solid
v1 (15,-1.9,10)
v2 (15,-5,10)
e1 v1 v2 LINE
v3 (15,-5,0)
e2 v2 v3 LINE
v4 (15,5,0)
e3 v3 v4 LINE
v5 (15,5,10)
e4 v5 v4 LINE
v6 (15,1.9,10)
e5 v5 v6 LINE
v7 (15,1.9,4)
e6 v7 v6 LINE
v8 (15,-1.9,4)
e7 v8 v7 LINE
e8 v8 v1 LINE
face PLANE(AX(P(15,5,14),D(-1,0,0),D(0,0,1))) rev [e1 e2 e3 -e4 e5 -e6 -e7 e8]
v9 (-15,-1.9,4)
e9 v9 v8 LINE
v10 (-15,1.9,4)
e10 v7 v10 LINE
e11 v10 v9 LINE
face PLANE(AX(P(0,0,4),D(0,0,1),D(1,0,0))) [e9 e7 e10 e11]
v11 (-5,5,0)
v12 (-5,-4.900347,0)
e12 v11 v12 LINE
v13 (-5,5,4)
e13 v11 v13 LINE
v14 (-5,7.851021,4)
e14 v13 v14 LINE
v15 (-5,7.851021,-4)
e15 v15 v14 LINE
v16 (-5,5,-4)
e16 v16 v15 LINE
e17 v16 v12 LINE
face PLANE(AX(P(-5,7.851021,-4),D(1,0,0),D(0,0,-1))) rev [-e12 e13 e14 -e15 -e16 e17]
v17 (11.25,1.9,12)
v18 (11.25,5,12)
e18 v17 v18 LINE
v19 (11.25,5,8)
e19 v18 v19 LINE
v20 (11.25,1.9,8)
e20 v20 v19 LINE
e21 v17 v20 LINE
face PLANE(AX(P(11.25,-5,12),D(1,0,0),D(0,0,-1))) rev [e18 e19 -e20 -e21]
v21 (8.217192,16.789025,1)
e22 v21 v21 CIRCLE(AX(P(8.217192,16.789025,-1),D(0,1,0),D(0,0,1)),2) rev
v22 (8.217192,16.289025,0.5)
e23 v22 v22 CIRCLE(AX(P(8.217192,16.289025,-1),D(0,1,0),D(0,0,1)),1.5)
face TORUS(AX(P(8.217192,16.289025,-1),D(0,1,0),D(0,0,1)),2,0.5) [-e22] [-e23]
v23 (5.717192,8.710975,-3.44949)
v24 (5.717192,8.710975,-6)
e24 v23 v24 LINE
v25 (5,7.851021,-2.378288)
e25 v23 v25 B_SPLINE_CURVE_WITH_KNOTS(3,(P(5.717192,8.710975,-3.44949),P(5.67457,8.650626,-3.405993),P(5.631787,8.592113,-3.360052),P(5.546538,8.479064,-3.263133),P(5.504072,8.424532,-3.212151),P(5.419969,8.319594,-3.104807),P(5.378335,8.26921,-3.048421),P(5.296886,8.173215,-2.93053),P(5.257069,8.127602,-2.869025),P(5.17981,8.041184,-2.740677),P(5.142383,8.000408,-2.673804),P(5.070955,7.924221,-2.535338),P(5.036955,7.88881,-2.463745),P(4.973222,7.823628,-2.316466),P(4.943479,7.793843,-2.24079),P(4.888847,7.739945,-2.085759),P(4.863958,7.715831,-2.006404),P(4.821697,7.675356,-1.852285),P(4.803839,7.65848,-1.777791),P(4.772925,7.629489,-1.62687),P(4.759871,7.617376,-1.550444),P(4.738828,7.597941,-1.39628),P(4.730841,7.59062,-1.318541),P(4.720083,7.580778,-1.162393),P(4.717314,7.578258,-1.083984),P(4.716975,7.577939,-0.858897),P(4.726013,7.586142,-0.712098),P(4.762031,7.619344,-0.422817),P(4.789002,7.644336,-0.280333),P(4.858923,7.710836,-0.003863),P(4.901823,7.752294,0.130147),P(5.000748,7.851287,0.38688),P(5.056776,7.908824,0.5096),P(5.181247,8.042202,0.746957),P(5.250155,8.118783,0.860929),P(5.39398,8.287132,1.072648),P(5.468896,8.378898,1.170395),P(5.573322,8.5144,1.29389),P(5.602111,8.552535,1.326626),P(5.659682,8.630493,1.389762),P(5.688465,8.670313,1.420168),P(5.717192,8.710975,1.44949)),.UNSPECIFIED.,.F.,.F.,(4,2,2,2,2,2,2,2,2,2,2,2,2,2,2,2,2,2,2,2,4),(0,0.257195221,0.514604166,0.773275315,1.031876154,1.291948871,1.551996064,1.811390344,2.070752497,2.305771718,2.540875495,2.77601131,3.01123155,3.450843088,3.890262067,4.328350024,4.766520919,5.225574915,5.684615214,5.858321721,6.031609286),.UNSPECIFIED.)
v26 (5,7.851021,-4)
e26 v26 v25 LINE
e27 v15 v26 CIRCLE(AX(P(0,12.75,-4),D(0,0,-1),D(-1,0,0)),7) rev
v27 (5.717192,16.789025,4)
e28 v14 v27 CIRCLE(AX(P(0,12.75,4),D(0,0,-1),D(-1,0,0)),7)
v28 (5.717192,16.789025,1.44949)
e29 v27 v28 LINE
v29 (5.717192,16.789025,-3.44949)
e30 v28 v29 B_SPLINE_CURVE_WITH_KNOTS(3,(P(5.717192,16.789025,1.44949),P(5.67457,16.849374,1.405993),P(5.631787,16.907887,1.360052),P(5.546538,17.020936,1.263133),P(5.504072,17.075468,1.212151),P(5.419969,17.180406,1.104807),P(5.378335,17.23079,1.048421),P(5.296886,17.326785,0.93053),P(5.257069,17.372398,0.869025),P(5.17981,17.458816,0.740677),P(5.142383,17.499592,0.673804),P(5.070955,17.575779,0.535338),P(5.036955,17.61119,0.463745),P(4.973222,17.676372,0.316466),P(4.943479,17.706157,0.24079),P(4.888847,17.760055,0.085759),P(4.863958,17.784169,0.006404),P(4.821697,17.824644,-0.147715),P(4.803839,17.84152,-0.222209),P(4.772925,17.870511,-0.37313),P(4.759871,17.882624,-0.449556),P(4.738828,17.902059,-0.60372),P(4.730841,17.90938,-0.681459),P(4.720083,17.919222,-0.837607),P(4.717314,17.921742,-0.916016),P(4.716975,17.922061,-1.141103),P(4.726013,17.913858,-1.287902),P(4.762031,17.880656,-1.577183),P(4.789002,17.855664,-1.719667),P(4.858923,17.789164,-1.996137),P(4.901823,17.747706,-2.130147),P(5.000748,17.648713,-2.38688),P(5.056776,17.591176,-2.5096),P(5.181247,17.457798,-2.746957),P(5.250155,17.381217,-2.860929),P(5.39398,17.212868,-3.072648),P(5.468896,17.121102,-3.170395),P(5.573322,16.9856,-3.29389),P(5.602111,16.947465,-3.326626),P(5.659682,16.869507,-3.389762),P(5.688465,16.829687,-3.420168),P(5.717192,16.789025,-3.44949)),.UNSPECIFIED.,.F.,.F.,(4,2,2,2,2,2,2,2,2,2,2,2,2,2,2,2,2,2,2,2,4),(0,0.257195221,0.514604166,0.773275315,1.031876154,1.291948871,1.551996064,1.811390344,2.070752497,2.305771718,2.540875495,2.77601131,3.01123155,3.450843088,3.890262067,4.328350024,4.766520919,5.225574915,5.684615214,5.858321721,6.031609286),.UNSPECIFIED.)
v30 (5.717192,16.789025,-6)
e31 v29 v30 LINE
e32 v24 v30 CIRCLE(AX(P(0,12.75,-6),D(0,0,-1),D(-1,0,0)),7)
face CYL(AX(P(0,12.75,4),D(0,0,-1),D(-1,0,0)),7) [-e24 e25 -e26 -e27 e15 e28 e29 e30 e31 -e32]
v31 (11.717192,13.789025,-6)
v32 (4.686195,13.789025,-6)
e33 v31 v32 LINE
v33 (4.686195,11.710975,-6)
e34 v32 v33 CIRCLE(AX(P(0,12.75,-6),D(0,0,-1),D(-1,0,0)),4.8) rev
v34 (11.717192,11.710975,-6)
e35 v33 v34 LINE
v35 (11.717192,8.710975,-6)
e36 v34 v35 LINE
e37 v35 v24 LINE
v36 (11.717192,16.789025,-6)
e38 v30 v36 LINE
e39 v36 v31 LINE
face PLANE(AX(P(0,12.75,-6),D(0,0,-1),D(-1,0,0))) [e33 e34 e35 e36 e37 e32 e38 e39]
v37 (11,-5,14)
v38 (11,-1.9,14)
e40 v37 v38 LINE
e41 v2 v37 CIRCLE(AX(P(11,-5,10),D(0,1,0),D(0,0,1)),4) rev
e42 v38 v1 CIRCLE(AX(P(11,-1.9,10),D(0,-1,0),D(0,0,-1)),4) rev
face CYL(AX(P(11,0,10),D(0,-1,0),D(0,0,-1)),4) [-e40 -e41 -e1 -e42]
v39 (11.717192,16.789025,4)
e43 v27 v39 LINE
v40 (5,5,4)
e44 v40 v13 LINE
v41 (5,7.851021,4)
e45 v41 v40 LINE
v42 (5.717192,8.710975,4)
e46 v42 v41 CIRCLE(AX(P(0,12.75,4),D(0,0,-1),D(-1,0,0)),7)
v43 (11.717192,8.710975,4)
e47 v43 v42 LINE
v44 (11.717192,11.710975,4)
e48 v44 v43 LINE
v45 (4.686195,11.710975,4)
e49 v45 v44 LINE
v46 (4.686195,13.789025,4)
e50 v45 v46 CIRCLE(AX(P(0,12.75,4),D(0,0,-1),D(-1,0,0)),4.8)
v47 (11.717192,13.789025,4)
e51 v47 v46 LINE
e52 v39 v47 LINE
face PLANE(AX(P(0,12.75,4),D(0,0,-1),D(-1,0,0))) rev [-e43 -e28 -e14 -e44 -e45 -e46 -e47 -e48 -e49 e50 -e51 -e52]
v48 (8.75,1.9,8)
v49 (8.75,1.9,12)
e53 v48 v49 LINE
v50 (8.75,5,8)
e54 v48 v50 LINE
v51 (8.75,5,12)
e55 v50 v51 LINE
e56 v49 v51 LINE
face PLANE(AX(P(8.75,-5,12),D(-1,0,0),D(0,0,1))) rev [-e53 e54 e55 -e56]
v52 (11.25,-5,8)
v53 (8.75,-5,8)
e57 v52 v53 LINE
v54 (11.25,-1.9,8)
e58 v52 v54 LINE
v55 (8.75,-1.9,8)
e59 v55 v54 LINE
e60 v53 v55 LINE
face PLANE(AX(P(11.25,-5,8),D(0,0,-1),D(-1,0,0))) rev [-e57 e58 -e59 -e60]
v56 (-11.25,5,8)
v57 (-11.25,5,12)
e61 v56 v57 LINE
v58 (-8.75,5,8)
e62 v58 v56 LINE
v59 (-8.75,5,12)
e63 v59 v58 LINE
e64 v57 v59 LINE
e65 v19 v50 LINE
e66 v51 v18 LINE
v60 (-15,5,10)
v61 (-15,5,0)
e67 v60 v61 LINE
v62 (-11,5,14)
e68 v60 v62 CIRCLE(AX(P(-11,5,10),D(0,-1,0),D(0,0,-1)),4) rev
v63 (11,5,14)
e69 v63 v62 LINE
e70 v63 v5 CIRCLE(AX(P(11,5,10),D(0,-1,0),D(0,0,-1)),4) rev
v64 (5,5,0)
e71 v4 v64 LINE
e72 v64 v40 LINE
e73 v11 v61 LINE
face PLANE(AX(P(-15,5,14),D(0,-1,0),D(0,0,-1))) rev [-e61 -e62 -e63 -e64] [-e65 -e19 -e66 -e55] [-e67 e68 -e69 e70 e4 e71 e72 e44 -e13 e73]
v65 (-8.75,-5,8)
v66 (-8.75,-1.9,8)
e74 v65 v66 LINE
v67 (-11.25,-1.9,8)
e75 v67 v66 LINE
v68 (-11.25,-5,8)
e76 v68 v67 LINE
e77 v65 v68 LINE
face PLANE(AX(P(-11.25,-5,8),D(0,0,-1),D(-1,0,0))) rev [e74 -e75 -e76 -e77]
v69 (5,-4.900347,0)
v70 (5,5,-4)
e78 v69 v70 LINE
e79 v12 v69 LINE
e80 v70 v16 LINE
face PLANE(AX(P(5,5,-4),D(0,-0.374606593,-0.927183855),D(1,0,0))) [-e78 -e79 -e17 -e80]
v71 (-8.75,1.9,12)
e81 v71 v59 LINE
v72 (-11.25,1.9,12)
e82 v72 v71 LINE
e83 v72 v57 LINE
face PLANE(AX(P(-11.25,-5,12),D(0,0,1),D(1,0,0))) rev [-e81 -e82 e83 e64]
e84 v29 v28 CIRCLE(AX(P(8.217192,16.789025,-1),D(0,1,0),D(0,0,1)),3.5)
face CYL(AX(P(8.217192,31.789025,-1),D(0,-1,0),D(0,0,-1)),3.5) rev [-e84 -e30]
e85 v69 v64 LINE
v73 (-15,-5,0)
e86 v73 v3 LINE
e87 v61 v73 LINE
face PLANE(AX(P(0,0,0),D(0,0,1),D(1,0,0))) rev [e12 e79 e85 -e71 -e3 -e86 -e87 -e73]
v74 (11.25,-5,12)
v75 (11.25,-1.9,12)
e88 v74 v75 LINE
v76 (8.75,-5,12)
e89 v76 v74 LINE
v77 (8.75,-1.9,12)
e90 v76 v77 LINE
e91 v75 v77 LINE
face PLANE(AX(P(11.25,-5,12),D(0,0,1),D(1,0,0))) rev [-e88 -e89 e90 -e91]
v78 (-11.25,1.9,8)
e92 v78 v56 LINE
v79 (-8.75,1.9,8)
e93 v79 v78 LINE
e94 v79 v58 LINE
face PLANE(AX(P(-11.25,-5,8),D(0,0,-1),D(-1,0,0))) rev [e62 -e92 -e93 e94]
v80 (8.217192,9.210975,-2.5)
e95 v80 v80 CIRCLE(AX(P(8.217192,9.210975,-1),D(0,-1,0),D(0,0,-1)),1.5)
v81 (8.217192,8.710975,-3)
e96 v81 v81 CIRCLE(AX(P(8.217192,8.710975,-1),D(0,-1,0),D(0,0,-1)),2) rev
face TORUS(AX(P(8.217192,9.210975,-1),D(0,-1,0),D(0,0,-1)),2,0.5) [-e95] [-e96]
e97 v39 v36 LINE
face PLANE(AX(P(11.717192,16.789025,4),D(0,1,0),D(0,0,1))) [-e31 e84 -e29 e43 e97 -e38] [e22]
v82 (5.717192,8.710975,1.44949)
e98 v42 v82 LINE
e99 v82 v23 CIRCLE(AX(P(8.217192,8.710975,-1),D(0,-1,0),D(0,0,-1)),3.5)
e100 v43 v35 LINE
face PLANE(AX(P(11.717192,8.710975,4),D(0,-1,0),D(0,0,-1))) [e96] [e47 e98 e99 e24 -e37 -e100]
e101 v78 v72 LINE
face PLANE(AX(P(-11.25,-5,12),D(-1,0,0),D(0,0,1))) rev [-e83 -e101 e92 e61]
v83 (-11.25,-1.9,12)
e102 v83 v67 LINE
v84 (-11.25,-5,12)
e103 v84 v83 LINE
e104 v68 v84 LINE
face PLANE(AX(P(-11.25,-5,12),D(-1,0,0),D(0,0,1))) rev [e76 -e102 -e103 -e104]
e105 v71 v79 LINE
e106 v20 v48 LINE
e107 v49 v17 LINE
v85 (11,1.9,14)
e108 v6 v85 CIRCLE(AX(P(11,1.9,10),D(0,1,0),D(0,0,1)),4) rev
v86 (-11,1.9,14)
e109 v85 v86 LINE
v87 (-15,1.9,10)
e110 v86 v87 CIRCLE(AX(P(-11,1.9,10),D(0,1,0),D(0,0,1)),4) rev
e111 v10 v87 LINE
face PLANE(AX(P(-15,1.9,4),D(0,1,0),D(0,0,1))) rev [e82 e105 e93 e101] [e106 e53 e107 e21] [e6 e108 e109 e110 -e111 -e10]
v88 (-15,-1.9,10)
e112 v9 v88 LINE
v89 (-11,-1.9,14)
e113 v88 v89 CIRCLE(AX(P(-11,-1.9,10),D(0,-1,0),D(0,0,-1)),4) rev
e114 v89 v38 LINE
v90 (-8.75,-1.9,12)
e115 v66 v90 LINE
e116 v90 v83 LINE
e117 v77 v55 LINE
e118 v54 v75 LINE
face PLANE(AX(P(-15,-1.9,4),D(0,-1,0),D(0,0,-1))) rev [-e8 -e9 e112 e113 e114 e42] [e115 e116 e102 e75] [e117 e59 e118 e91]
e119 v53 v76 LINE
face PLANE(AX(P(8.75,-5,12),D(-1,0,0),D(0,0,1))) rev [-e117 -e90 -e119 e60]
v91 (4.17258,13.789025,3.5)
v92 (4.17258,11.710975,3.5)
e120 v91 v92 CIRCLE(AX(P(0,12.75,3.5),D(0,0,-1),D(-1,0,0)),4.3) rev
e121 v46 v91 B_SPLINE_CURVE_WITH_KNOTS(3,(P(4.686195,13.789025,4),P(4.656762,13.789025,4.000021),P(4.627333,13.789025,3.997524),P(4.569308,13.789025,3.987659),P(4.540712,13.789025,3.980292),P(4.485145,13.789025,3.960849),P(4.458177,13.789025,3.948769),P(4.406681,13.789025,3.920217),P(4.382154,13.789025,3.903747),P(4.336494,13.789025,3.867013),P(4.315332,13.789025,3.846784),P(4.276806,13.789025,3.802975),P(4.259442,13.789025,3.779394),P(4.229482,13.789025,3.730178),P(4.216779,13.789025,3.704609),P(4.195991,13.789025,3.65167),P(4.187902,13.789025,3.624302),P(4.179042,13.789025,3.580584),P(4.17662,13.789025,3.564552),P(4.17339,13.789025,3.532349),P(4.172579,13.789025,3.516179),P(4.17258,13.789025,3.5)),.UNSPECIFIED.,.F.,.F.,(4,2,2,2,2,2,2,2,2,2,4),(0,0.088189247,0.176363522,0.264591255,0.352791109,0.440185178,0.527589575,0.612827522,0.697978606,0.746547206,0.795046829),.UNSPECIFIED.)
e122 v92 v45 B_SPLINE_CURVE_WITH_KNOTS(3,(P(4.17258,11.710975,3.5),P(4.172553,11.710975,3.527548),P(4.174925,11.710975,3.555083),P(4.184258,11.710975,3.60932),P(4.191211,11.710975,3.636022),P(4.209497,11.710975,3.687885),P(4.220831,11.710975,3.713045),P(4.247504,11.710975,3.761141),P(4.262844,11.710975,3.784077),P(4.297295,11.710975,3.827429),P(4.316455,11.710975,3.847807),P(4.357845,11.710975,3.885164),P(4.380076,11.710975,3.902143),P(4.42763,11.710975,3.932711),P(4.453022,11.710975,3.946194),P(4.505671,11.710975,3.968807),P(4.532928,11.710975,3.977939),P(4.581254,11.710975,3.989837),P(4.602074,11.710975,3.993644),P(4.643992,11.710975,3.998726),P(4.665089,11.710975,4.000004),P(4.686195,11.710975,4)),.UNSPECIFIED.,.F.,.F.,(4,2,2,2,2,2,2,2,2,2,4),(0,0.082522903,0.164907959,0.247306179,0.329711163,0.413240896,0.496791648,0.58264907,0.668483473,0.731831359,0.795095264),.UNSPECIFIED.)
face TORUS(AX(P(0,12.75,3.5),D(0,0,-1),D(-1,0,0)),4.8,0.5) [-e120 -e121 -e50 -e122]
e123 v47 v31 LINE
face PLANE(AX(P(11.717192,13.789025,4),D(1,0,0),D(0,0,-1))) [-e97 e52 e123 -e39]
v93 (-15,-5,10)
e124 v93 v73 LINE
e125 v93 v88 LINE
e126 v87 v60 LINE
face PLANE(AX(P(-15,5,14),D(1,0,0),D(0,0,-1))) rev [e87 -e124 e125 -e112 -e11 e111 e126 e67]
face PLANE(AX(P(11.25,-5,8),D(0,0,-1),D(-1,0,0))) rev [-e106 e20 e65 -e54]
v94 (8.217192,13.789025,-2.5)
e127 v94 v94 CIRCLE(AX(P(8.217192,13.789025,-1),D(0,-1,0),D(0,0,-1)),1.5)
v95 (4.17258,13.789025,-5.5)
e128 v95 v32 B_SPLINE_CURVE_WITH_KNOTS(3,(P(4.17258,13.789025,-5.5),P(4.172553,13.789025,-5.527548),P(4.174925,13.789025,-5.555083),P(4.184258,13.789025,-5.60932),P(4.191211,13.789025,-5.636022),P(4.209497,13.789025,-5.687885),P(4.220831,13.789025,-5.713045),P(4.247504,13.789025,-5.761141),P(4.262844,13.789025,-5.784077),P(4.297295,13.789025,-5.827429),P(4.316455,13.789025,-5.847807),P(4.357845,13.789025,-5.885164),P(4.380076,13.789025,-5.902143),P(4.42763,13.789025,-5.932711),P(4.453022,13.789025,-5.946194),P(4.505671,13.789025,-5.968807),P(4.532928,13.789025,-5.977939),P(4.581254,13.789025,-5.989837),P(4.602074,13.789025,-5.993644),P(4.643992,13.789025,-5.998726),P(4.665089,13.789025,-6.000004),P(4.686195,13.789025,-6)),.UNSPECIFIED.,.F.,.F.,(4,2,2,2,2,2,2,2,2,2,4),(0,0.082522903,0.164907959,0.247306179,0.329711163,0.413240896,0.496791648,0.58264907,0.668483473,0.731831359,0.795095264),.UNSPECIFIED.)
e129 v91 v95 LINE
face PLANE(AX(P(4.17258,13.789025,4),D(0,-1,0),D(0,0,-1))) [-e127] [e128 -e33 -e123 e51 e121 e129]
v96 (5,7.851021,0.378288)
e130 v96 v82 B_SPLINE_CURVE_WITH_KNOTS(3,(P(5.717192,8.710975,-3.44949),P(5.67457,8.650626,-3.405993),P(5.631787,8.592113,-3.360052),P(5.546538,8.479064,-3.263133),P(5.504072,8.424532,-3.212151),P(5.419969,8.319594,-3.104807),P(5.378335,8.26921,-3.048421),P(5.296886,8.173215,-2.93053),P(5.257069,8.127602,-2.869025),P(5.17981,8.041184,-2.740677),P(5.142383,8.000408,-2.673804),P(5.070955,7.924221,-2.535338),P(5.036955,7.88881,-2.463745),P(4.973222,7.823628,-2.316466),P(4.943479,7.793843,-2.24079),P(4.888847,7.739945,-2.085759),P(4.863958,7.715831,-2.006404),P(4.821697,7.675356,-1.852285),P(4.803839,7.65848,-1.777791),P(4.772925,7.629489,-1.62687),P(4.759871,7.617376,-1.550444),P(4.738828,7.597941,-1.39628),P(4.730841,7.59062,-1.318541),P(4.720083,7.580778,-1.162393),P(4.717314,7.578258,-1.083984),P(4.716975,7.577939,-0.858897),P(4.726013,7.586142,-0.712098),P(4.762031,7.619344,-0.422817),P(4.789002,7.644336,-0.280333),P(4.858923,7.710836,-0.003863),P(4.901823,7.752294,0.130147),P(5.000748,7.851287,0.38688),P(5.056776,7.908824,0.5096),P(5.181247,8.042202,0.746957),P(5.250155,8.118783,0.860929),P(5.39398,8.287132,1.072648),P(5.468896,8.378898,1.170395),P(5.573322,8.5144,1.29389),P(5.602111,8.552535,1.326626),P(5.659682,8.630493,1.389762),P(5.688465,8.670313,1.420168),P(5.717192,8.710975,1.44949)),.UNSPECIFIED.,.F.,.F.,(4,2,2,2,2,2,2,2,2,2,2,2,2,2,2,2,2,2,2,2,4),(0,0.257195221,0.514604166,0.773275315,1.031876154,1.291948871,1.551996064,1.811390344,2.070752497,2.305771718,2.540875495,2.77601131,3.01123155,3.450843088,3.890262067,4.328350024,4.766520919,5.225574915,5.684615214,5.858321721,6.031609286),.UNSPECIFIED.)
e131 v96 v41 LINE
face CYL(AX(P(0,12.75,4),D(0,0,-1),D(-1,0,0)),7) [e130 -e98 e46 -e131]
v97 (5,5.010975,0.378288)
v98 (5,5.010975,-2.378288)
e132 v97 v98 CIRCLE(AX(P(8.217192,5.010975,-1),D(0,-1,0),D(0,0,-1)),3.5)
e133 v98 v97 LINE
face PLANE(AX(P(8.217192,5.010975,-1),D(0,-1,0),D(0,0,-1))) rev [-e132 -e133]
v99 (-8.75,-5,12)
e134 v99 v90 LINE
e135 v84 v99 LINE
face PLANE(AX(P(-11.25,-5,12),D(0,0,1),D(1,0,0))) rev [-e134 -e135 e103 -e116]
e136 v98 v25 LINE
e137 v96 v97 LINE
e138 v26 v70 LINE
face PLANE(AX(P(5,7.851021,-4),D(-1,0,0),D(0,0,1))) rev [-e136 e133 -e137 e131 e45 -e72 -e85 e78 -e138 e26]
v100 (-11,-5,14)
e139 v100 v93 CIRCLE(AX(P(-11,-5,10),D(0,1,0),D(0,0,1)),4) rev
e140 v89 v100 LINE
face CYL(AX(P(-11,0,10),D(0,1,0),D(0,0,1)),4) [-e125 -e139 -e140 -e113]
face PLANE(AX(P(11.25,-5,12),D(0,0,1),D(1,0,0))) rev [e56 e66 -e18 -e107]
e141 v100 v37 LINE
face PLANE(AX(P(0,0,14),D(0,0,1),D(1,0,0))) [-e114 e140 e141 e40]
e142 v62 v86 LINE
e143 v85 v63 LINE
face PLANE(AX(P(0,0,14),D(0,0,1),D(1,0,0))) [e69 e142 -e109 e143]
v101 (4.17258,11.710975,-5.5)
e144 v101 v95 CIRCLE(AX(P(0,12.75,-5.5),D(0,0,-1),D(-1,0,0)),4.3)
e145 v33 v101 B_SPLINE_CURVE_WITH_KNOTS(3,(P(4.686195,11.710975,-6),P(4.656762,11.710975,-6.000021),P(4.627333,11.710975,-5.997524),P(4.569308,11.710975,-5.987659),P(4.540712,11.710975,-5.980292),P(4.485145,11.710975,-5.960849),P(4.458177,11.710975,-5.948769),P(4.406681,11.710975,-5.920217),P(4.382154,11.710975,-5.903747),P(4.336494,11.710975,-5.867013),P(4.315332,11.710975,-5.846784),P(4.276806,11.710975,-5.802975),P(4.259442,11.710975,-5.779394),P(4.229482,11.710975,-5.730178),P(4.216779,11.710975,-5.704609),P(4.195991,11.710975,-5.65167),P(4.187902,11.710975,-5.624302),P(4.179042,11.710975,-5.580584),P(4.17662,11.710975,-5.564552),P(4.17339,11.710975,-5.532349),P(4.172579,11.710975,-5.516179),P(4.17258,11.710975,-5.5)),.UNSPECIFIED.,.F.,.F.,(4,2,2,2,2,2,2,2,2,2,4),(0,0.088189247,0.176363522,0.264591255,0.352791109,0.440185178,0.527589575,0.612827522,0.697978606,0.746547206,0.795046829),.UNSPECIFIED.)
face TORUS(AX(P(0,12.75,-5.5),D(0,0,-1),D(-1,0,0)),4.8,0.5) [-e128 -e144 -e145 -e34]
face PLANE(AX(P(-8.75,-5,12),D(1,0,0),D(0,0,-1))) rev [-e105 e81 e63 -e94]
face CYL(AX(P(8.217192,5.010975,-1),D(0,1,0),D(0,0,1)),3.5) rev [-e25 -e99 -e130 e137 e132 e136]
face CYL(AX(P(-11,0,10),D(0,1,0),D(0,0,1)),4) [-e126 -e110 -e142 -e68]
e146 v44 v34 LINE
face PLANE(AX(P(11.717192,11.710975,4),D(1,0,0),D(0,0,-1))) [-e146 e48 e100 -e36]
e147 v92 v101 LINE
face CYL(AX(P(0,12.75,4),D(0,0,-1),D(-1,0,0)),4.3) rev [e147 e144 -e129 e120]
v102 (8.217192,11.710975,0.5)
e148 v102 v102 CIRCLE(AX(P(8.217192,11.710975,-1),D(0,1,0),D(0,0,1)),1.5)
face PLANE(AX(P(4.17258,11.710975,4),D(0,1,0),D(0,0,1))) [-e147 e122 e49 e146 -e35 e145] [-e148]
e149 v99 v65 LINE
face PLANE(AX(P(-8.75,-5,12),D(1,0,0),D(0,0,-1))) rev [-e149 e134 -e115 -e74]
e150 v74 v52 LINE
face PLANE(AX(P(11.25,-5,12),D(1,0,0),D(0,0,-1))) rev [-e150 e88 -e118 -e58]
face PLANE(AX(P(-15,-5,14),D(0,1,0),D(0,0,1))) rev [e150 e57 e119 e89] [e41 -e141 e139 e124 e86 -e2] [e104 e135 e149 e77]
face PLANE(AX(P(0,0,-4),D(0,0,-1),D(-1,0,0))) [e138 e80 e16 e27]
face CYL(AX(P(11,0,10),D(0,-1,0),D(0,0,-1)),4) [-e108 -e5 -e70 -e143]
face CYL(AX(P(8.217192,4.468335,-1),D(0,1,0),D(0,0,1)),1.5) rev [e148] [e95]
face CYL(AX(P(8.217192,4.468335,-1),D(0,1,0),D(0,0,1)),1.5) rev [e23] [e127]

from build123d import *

# Parameters (mm, degrees)
ESBO_O1_W                     = 30
ESBO_O1_H                     = 10
RESSALTO_EXTRUS_O1_DEPTH      = 14
ESBO_O2_W                     = 30
ESBO_O2_H                     = 3.8
CORTE_EXTRUS_O1_DEPTH         = 10
FILETE1_R                     = 4
ESBO_O3_W                     = 2.5
ESBO_O3_H                     = 4
CORTE_EXTRUS_O2_DEPTH         = 23.825424421
RESSALTO_EXTRUS_O2_DEPTH      = 6
RESSALTO_EXTRUS_O2_DEPTH_BACK = 4
ESBO_O5_W                     = 10
ESBO_O5_H                     = 2.851020514
RESSALTO_EXTRUS_O3_DEPTH      = 8
CHANFRO1_SIZE2                = 9.900347414
CHANFRO1_SIZE                 = 4
CORTE_EXTRUS_O3_REACH         = 31.929
ESBO_O7_R                     = 1.5
FILETE2_R                     = 0.5
ESBO_O8_R                     = 3.5
CORTE_EXTRUS_O4_DEPTH         = 15
ESBO_O9_R                     = 3.5
CORTE_EXTRUS_O5_DEPTH         = 3.7


with BuildPart() as part:
    # Esboço1 → Ressalto-extrusão1 (new body)
    with BuildSketch(Plane.XY):
        Rectangle(ESBO_O1_W, ESBO_O1_H)
    extrude(amount=RESSALTO_EXTRUS_O1_DEPTH)

    # Esboço2 → Corte-extrusão1 (cut)
    with BuildSketch(Plane.XY.offset(14)):
        Rectangle(ESBO_O2_W, ESBO_O2_H)
    extrude(amount=-CORTE_EXTRUS_O1_DEPTH, mode=Mode.SUBTRACT)

    # Filete1
    filete1_edges = [part.edges().sort_by_distance(p)[0] for p in [
        (-15, 3.45, 14),
        (15, 3.45, 14),
        (-15, -3.45, 14),
        (15, -3.45, 14),
    ]]
    fillet(filete1_edges, radius=FILETE1_R)

    # Esboço3 → Corte-extrusão2 (cut, through all)
    with BuildSketch(Plane(origin=(0, 5, 0), x_dir=(1, 0, 0), z_dir=(0, 1, 0))):
        with Locations((10, -10)):
            Rectangle(ESBO_O3_W, ESBO_O3_H)
        with Locations((-10, -10)):
            Rectangle(ESBO_O3_W, ESBO_O3_H)
    extrude(amount=-CORTE_EXTRUS_O2_DEPTH, mode=Mode.SUBTRACT)


with BuildPart() as body_2:
    # Esboço4 → Ressalto-extrusão2 (new, two sides: drawn at the far end of the back side and taken through both)
    with BuildSketch(Plane(origin=(0, 0, 0), x_dir=(-1, 0, 0), z_dir=(0, 0, -1)).offset(-RESSALTO_EXTRUS_O2_DEPTH_BACK)):
        with BuildLine():
            Line((-4.17258046, 13.789024691), (-11.717191579, 13.789024691))
            Line((-11.717191579, 13.789024691), (-11.717191579, 16.789024691))
            Line((-11.717191579, 16.789024691), (-5.717191579, 16.789024691))
            ThreePointArc((-5.717191579, 16.789024691), (7, 12.75), (-5.717191579, 8.710975309))
            Line((-5.717191579, 8.710975309), (-11.717191579, 8.710975309))
            Line((-11.717191579, 8.710975309), (-11.717191579, 11.710975309))
            Line((-11.717191579, 11.710975309), (-4.17258046, 11.710975309))
            ThreePointArc((-4.17258046, 11.710975309), (4.3, 12.75), (-4.17258046, 13.789024691))
        make_face()
    extrude(amount=RESSALTO_EXTRUS_O2_DEPTH + RESSALTO_EXTRUS_O2_DEPTH_BACK)

    # Esboço5 → Ressalto-extrusão3 (add)
    with BuildSketch(Plane(origin=(0, 0, 4), x_dir=(-1, 0, 0), z_dir=(0, 0, -1))):
        with Locations((0, 6.425510257)):
            Rectangle(ESBO_O5_W, ESBO_O5_H)
    extrude(amount=RESSALTO_EXTRUS_O3_DEPTH)

    # Combinar1: union part
    add(part.part)

    # Chanfro1
    chanfro1_edges = [body_2.edges().sort_by_distance(p)[0] for p in [
        (0, 5, 0),
    ]]
    chanfro1_side = [body_2.faces().sort_by_distance(p)[0] for p in [
        (0, 5, -0.08),
    ]]
    chamfer(chanfro1_edges, length=CHANFRO1_SIZE - 0.0001, length2=CHANFRO1_SIZE2 - 0.0001, reference=chanfro1_side[0])  # a hair under: the kernel refuses the full size

    # Corte-extrusão3: up to this face of the body (flat: up to its plane)
    corte_extrus_o3_end = Plane(body_2.part.faces().sort_by_distance((8.717191579, 8.710975309, -1))[0])
    # Esboço7 → Corte-extrusão3 (cut, up to the picked face)
    with BuildSketch(Plane(origin=(0, 16.789024691, 0), x_dir=(1, 0, 0), z_dir=(0, 1, 0)), mode=Mode.PRIVATE) as corte_extrus_o3_sk1:
        with Locations(Location((8.217191579, 1, 0), (0, 0, 270))):
            Circle(ESBO_O7_R)
    corte_extrus_o3_tool1 = split(extrude(corte_extrus_o3_sk1.sketch, amount=-CORTE_EXTRUS_O3_REACH, mode=Mode.PRIVATE), bisect_by=corte_extrus_o3_end, keep=Keep.BOTH, mode=Mode.PRIVATE)
    add(corte_extrus_o3_tool1.solids().sort_by(Axis((8.217192, 16.789025, -1), (0, -1, 0)))[0], mode=Mode.SUBTRACT)

    # Filete2
    filete2_edges = [body_2.edges().sort_by_distance(p)[0] for p in [
        (8.217191579, 16.789024691, -2.5),
        (8.217191579, 8.710975309, -2.5),
        (-4.3, 12.75, -6),
        (-4.3, 12.75, 4),
    ]]
    fillet(filete2_edges, radius=FILETE2_R)

    # Esboço8 → Corte-extrusão4 (cut)
    with BuildSketch(Plane(origin=(0, 16.789024691, 0), x_dir=(1, 0, 0), z_dir=(0, 1, 0))):
        with Locations((8.217191579, 1)):
            Circle(ESBO_O8_R)
    extrude(amount=CORTE_EXTRUS_O4_DEPTH, mode=Mode.SUBTRACT)

    # Esboço9 → Corte-extrusão5 (cut)
    with BuildSketch(Plane.XZ.offset(-8.710975309)):
        with Locations((8.217191579, -1)):
            Circle(ESBO_O9_R)
    extrude(amount=CORTE_EXTRUS_O5_DEPTH, mode=Mode.SUBTRACT)


solid = body_2.part
